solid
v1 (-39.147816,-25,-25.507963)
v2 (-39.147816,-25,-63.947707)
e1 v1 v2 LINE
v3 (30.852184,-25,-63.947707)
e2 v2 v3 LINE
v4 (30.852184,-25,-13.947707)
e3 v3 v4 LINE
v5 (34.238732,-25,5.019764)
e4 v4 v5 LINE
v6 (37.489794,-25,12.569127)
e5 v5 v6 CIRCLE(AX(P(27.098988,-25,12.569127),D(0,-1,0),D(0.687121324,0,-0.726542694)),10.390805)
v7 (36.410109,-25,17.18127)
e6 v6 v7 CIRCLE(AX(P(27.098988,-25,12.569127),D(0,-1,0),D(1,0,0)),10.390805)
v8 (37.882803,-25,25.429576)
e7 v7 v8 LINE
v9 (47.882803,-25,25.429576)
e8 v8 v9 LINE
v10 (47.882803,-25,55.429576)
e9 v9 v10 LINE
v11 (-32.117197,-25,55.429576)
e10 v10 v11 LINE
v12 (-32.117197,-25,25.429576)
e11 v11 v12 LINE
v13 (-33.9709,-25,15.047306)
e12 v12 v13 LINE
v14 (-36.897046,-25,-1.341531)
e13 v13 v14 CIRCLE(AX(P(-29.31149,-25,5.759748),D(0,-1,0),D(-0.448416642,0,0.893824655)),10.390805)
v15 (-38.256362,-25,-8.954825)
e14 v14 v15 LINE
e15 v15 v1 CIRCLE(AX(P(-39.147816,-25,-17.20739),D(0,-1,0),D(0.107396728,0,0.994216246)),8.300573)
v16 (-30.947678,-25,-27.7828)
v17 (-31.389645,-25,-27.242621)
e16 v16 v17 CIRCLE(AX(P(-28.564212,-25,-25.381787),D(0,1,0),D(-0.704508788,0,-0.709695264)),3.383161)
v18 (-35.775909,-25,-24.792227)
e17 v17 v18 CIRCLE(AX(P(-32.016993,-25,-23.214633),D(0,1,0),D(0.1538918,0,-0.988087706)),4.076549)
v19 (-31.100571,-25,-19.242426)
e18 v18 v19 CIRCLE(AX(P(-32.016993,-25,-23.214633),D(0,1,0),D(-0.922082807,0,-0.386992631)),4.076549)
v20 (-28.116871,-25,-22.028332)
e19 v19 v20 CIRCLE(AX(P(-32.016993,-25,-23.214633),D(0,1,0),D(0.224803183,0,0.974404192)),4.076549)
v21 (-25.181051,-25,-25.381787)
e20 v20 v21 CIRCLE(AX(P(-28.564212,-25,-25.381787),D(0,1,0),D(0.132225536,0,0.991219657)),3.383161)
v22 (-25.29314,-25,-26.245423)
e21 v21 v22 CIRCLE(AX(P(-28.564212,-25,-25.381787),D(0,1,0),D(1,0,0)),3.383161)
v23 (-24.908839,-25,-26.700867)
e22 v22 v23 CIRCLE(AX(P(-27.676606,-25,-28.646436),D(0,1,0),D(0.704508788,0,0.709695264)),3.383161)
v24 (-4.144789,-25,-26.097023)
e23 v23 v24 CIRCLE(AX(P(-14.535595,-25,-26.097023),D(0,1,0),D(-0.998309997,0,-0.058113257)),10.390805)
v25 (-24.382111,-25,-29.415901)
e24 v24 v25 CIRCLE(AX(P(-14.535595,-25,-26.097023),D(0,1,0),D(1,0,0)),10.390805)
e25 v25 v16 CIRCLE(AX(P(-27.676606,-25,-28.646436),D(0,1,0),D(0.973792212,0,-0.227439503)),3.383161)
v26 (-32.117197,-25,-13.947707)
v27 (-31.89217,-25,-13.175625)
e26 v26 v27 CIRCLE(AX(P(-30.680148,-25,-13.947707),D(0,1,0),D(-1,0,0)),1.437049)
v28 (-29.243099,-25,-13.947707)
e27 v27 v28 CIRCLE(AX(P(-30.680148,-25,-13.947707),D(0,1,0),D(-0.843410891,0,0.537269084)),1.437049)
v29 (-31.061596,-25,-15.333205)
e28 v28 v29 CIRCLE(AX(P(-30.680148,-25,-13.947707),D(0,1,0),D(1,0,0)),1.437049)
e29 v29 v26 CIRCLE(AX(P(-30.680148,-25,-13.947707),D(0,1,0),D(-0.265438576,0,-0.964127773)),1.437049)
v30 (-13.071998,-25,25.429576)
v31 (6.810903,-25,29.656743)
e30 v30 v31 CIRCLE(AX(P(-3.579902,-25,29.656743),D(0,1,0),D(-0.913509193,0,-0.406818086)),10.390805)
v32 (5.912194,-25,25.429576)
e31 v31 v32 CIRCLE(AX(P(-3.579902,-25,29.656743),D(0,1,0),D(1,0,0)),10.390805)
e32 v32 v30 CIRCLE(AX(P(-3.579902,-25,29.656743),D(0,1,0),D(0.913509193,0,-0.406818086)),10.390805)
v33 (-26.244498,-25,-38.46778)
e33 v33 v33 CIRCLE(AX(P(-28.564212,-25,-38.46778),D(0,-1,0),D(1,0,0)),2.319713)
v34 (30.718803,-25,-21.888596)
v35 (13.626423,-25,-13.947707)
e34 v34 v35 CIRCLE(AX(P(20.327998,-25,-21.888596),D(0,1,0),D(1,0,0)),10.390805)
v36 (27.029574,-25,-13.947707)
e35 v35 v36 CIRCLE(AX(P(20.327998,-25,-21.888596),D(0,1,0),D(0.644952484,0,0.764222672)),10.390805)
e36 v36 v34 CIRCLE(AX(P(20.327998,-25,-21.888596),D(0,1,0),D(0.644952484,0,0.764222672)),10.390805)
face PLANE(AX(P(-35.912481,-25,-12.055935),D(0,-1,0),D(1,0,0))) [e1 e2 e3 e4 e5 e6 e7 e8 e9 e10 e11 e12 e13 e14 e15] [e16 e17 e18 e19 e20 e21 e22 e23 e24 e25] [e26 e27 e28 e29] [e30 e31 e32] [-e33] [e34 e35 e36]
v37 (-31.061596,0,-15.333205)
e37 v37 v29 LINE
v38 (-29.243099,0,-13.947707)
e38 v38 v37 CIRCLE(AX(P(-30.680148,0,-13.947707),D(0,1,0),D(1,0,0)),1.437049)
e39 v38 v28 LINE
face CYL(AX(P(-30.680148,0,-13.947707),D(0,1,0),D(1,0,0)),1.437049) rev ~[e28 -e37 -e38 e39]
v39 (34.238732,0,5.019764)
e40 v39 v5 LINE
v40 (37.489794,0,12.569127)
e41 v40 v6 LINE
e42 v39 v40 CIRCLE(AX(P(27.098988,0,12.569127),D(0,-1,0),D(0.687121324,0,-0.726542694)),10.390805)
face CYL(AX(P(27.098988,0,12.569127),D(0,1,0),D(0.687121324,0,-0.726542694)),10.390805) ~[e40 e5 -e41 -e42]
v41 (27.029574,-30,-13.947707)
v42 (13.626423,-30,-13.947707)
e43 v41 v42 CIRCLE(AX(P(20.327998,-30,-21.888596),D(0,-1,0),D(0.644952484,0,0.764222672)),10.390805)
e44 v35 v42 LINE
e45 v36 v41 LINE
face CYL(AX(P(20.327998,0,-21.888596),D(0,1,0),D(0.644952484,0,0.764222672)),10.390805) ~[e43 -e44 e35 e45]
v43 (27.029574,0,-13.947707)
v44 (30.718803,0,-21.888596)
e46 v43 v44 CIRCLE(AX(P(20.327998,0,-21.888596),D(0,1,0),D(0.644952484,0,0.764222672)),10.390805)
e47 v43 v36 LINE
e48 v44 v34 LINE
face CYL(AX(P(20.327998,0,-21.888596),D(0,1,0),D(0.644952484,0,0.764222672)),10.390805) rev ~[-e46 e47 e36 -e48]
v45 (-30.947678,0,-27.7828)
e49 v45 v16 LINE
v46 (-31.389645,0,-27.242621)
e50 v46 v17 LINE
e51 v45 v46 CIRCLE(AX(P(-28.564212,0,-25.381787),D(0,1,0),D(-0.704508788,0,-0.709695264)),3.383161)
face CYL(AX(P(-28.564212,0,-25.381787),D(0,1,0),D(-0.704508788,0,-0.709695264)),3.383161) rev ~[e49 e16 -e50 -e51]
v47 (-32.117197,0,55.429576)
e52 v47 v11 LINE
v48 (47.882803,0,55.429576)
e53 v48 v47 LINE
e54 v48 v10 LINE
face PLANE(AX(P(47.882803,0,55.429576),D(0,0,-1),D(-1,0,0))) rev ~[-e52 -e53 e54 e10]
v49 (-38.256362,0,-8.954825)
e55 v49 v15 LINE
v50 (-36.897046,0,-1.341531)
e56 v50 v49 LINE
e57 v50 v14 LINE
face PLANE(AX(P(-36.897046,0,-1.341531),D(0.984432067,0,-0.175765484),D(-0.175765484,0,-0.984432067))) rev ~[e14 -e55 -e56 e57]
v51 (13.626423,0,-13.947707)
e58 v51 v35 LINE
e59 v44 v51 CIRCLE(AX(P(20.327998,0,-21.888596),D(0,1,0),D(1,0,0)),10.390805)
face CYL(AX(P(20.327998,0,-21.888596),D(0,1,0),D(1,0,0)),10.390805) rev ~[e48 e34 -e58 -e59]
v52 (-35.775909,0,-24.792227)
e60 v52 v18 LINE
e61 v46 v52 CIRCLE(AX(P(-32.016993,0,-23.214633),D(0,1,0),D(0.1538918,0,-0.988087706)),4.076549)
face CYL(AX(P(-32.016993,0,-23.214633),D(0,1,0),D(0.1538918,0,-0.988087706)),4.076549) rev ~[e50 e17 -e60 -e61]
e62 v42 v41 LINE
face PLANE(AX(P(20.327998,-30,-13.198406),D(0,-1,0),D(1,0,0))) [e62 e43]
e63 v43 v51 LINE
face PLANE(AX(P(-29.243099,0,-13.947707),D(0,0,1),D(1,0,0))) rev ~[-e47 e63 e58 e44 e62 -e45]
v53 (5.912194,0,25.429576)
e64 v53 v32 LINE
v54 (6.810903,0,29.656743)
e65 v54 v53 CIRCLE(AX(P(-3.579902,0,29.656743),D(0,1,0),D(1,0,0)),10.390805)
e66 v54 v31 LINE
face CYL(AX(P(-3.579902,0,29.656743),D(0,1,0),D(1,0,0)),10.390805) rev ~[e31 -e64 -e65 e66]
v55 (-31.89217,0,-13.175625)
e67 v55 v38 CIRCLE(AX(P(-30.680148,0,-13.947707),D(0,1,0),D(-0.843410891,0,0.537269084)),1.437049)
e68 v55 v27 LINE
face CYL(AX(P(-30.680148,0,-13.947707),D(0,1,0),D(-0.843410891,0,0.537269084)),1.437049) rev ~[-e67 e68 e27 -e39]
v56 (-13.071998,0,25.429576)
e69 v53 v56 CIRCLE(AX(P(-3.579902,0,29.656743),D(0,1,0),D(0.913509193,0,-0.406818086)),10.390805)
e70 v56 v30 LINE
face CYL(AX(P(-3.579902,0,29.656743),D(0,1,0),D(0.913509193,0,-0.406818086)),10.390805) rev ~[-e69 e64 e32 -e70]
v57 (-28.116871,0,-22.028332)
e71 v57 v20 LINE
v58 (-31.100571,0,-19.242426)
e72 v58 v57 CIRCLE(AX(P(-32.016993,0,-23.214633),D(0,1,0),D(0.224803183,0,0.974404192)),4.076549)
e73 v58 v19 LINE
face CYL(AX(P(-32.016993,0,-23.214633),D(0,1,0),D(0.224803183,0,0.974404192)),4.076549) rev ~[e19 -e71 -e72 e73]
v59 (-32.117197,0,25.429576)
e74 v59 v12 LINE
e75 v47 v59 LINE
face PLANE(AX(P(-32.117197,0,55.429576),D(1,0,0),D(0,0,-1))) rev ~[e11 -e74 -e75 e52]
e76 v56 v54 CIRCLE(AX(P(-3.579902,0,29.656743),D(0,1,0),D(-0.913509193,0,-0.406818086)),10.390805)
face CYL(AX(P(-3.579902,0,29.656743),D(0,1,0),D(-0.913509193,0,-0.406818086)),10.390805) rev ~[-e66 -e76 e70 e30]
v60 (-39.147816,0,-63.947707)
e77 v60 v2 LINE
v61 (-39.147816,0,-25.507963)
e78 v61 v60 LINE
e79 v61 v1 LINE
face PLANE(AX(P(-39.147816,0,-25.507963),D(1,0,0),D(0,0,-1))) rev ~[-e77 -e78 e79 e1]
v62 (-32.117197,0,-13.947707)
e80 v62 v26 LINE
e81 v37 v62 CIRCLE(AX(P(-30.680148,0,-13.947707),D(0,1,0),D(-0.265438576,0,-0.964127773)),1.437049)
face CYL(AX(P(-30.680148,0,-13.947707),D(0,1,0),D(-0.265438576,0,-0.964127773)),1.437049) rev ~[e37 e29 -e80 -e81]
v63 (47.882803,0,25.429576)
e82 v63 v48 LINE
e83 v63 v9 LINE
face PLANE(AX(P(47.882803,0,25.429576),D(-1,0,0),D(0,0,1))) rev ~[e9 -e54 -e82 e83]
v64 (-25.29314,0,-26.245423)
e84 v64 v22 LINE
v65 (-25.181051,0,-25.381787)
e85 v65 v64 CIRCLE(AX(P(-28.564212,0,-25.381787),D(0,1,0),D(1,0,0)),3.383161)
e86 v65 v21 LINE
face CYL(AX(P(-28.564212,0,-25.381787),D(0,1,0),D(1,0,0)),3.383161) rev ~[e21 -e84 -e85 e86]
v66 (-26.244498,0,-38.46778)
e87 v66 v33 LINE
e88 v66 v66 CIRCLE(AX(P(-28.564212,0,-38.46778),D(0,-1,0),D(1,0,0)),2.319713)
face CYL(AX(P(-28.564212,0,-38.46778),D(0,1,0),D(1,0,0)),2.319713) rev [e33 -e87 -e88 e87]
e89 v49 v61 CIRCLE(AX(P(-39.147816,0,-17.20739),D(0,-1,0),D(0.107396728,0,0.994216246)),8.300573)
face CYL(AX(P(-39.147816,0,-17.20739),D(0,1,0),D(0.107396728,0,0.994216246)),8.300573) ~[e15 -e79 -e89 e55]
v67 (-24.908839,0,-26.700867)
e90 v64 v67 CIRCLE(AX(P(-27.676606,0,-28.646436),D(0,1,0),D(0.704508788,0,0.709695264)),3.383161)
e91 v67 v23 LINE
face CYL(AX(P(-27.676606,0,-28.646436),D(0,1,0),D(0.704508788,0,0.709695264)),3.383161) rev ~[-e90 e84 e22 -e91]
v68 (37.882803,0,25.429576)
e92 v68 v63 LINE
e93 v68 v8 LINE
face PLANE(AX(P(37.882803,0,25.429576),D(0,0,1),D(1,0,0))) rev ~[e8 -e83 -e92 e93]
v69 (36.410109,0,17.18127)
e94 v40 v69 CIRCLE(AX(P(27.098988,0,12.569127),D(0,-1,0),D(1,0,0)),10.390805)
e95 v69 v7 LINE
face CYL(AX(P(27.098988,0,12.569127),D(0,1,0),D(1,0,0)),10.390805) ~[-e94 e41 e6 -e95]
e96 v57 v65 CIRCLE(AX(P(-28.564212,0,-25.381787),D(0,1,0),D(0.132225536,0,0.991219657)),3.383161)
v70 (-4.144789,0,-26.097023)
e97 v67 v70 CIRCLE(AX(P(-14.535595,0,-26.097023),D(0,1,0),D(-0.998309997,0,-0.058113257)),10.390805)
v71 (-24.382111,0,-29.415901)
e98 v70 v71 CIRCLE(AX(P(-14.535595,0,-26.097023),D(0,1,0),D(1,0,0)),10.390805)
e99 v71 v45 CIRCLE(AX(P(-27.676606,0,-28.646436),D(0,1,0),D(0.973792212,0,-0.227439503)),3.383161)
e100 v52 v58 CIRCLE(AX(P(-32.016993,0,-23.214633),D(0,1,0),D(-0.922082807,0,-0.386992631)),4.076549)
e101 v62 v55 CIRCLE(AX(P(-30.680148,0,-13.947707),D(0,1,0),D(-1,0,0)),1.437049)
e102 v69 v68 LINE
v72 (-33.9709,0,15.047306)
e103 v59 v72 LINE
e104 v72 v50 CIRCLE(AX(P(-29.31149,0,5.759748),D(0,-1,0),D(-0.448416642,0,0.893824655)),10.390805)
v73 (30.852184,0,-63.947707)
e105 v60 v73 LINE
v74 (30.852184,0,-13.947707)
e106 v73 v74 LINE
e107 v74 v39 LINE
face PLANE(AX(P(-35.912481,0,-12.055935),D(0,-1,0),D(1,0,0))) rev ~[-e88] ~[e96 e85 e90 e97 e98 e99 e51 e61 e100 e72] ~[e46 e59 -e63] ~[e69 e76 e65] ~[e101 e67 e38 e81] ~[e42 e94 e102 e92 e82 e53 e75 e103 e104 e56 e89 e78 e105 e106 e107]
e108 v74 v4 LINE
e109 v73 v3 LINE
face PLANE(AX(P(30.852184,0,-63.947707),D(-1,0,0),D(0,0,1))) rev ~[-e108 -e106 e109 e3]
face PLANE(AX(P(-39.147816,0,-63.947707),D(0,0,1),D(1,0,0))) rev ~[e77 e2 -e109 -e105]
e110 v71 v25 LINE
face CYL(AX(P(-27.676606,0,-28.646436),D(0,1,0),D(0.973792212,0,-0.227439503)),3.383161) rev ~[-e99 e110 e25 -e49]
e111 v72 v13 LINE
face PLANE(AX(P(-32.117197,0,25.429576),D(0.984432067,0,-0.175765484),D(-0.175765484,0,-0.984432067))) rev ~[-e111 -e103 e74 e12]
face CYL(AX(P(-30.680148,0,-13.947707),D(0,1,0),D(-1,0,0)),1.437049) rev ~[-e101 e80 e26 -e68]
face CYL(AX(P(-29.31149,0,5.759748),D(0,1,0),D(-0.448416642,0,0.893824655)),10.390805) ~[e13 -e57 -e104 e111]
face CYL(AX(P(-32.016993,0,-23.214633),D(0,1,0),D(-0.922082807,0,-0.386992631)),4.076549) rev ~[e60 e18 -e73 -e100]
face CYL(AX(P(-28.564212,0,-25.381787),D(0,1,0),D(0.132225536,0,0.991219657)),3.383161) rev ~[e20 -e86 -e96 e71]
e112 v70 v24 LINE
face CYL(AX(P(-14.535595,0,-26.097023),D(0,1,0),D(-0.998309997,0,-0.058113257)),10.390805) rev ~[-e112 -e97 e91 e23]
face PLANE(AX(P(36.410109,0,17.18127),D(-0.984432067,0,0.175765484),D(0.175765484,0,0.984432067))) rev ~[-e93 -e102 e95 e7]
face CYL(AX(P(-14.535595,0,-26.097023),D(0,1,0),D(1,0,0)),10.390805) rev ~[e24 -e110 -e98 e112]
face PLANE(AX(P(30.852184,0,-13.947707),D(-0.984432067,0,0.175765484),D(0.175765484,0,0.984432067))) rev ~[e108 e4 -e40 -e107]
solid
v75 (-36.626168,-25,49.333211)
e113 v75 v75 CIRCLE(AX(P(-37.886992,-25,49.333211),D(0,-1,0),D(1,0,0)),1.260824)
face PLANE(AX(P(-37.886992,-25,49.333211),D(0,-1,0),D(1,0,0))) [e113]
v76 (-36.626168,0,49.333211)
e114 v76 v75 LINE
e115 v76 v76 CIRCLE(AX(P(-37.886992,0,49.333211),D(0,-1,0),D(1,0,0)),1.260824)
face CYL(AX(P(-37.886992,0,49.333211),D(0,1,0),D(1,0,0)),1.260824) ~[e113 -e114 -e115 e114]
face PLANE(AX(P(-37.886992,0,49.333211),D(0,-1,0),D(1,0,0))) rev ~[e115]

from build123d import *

# Parameters (mm, degrees)
F1_DEPTH = 25
F2_DEPTH = 30
F0_R     = 2.3197134373
F3_DEPTH = 25
F0_R_2   = 1.2608238745


with BuildPart() as f1:
    # F0 (on Front) → F1 (new body)
    with BuildSketch(Plane.XZ):
        with BuildLine():
            Line((-36.8970455988, -1.3415312964), (-38.2563615468, -8.9548247595))
            ThreePointArc((-38.2563615468, -8.9548247595), (-34.5600498563, -10.2898813947), (-31.8921704478, -13.1756249373))
            ThreePointArc((-31.8921704478, -13.1756249373), (-30.2780449791, -12.5680611078), (-29.2430992407, -13.9477067703))
            Line((-29.2430992407, -13.9477067703), (13.6264225575, -13.9477067703))
            ThreePointArc((13.6264225575, -13.9477067703), (20.327998141, -11.4977905039), (27.0295737244, -13.9477067703))
            Line((27.0295737244, -13.9477067703), (30.8521840286, -13.9477067703))
            Line((30.8521840286, -13.9477067703), (34.2387321722, 5.0197635093))
            ThreePointArc((34.2387321722, 5.0197635093), (16.8699466245, 14.3954719517), (36.4101090954, 17.1812700081))
            Line((36.4101090954, 17.1812700081), (37.8828033788, 25.4295759134))
            Line((37.8828033788, 25.4295759134), (5.9121937531, 25.4295759134))
            ThreePointArc((5.9121937531, 25.4295759134), (-3.5799022512, 19.265938237), (-13.0719982556, 25.4295759134))
            Line((-13.0719982556, 25.4295759134), (-32.1171966212, 25.4295759134))
            Line((-32.1171966212, 25.4295759134), (-33.9708996127, 15.0473061488))
            ThreePointArc((-33.9708996127, 15.0473061488), (-23.8546677668, 14.6023681954), (-18.9206845351, 5.7597483341))
            ThreePointArc((-18.9206845351, 5.7597483341), (-25.4938465616, -3.9043311549), (-36.8970455988, -1.3415312964))
        make_face()
        with BuildLine():
            ThreePointArc((27.0295737244, -13.9477067703), (20.327998141, -11.4977905039), (13.6264225575, -13.9477067703))
            Line((13.6264225575, -13.9477067703), (27.0295737244, -13.9477067703))
        make_face()
    extrude(amount=F1_DEPTH)

    # F0 (on Front) → F2 (join)
    with BuildSketch(Plane.XZ):
        with BuildLine():
            ThreePointArc((27.0295737244, -13.9477067703), (20.327998141, -11.4977905039), (13.6264225575, -13.9477067703))
            Line((13.6264225575, -13.9477067703), (27.0295737244, -13.9477067703))
        make_face()
    extrude(amount=F2_DEPTH)

    # F0 (on Front) → F3 (join)
    with BuildSketch(Plane.XZ):
        with BuildLine():
            Line((-38.2563615468, -8.9548247595), (-39.1478159714, -13.9477067703))
            Line((-39.1478159714, -13.9477067703), (-32.1171966212, -13.9477067703))
            ThreePointArc((-32.1171966212, -13.9477067703), (-32.0597935936, -13.5456038184), (-31.8921704478, -13.1756249373))
            ThreePointArc((-31.8921704478, -13.1756249373), (-34.5600498563, -10.2898813947), (-38.2563615468, -8.9548247595))
        make_face()
        with BuildLine():
            Line((-32.1171966212, -13.9477067703), (-39.1478159714, -13.9477067703))
            Line((-39.1478159714, -13.9477067703), (-39.1478159714, -25.5079631141))
            ThreePointArc((-39.1478159714, -25.5079631141), (-37.4242994609, -25.3270577869), (-35.7759086803, -24.7922272215))
            ThreePointArc((-35.7759086803, -24.7922272215), (-35.1346869248, -20.5881831631), (-31.1005712876, -19.2424258261))
            ThreePointArc((-31.1005712876, -19.2424258261), (-30.9108182069, -18.2327612754), (-30.8472425547, -17.2073896974))
            ThreePointArc((-30.8472425547, -17.2073896974), (-30.9010050472, -16.2641884324), (-31.0615960895, -15.3332053234))
            ThreePointArc((-31.0615960895, -15.3332053234), (-31.8232289681, -14.8186112891), (-32.1171966212, -13.9477067703))
        make_face()
        with BuildLine():
            Line((-39.1478159714, -25.5079631141), (-39.1478159714, -13.9477067703))
            Line((-39.1478159714, -13.9477067703), (-38.2563615468, -8.9548247595))
            ThreePointArc((-38.2563615468, -8.9548247595), (-47.4363785787, -16.7610165897), (-39.1478159714, -25.5079631141))
        make_face()
        with BuildLine():
            ThreePointArc((-35.7759086803, -24.7922272215), (-37.4242994609, -25.3270577869), (-39.1478159714, -25.5079631141))
            Line((-39.1478159714, -25.5079631141), (-39.1478159714, -63.9477067703))
            Line((-39.1478159714, -63.9477067703), (30.8521840286, -63.9477067703))
            Line((30.8521840286, -63.9477067703), (30.8521840286, -13.9477067703))
            Line((30.8521840286, -13.9477067703), (27.0295737244, -13.9477067703))
            ThreePointArc((27.0295737244, -13.9477067703), (29.7514687642, -17.510578657), (30.71880327, -21.8885956329))
            ThreePointArc((30.71880327, -21.8885956329), (15.949981165, -31.3120662561), (13.6264225575, -13.9477067703))
            Line((13.6264225575, -13.9477067703), (-29.2430992407, -13.9477067703))
            ThreePointArc((-29.2430992407, -13.9477067703), (-29.8092434122, -15.0907878075), (-31.0615960895, -15.3332053234))
            ThreePointArc((-31.0615960895, -15.3332053234), (-30.9010050472, -16.2641884324), (-30.8472425547, -17.2073896974))
            ThreePointArc((-30.8472425547, -17.2073896974), (-30.9108182069, -18.2327612754), (-31.1005712876, -19.2424258261))
            ThreePointArc((-31.1005712876, -19.2424258261), (-29.2348911506, -20.2350073875), (-28.1168713895, -22.0283317708))
            ThreePointArc((-28.1168713895, -22.0283317708), (-26.0187057491, -23.153295251), (-25.1810509111, -25.3817871757))
            ThreePointArc((-25.1810509111, -25.3817871757), (-25.209190214, -25.817226894), (-25.2931400278, -26.2454231077))
            ThreePointArc((-25.2931400278, -26.2454231077), (-25.0909422893, -26.4646669846), (-24.908839255, -26.7008666627))
            ThreePointArc((-24.908839255, -26.7008666627), (-14.8376440321, -15.7106090516), (-4.1447894931, -26.0970231288))
            ThreePointArc((-4.1447894931, -26.0970231288), (-12.8539883778, -36.3508532263), (-24.3821109254, -29.4159006375))
            ThreePointArc((-24.3821109254, -29.4159006375), (-28.4932406364, -31.9295574903), (-30.9476780862, -27.7828003139))
            ThreePointArc((-30.9476780862, -27.7828003139), (-31.1826286879, -27.5241383485), (-31.3896450432, -27.2426209845))
            ThreePointArc((-31.3896450432, -27.2426209845), (-34.0051544965, -26.7734902048), (-35.7759086803, -24.7922272215))
        make_face()
        with Locations((-28.5642116289, -38.4677797556)):
            Circle(F0_R, mode=Mode.SUBTRACT)
        with BuildLine():
            Line((-36.8970455988, -1.3415312964), (-38.2563615468, -8.9548247595))
            ThreePointArc((-38.2563615468, -8.9548247595), (-34.5600498563, -10.2898813947), (-31.8921704478, -13.1756249373))
            ThreePointArc((-31.8921704478, -13.1756249373), (-30.2780449791, -12.5680611078), (-29.2430992407, -13.9477067703))
            Line((-29.2430992407, -13.9477067703), (13.6264225575, -13.9477067703))
            ThreePointArc((13.6264225575, -13.9477067703), (20.327998141, -11.4977905039), (27.0295737244, -13.9477067703))
            Line((27.0295737244, -13.9477067703), (30.8521840286, -13.9477067703))
            Line((30.8521840286, -13.9477067703), (34.2387321722, 5.0197635093))
            ThreePointArc((34.2387321722, 5.0197635093), (16.8699466245, 14.3954719517), (36.4101090954, 17.1812700081))
            Line((36.4101090954, 17.1812700081), (37.8828033788, 25.4295759134))
            Line((37.8828033788, 25.4295759134), (5.9121937531, 25.4295759134))
            ThreePointArc((5.9121937531, 25.4295759134), (-3.5799022512, 19.265938237), (-13.0719982556, 25.4295759134))
            Line((-13.0719982556, 25.4295759134), (-32.1171966212, 25.4295759134))
            Line((-32.1171966212, 25.4295759134), (-33.9708996127, 15.0473061488))
            ThreePointArc((-33.9708996127, 15.0473061488), (-23.8546677668, 14.6023681954), (-18.9206845351, 5.7597483341))
            ThreePointArc((-18.9206845351, 5.7597483341), (-25.4938465616, -3.9043311549), (-36.8970455988, -1.3415312964))
        make_face()
        with BuildLine():
            ThreePointArc((-33.9708996127, 15.0473061488), (-39.540531436, 7.5860932242), (-36.8970455988, -1.3415312964))
            Line((-36.8970455988, -1.3415312964), (-33.9708996127, 15.0473061488))
        make_face()
        with BuildLine():
            Line((-33.9708996127, 15.0473061488), (-36.8970455988, -1.3415312964))
            ThreePointArc((-36.8970455988, -1.3415312964), (-25.4938465616, -3.9043311549), (-18.9206845351, 5.7597483341))
            ThreePointArc((-18.9206845351, 5.7597483341), (-23.8546677668, 14.6023681954), (-33.9708996127, 15.0473061488))
        make_face()
        with BuildLine():
            Line((-32.1171966212, 55.4295759134), (-32.1171966212, 25.4295759134))
            Line((-32.1171966212, 25.4295759134), (-13.0719982556, 25.4295759134))
            ThreePointArc((-13.0719982556, 25.4295759134), (-5.740725171, 39.8203881619), (6.8109028777, 29.6567433659))
            ThreePointArc((6.8109028777, 29.6567433659), (6.5837425447, 27.4959204462), (5.9121937531, 25.4295759134))
            Line((5.9121937531, 25.4295759134), (37.8828033788, 25.4295759134))
            Line((37.8828033788, 25.4295759134), (47.8828033788, 25.4295759134))
            Line((47.8828033788, 25.4295759134), (47.8828033788, 55.4295759134))
            Line((47.8828033788, 55.4295759134), (-32.1171966212, 55.4295759134))
        make_face()
        with BuildLine():
            ThreePointArc((36.4101090954, 17.1812700081), (16.8699466245, 14.3954719517), (34.2387321722, 5.0197635093))
            Line((34.2387321722, 5.0197635093), (36.4101090954, 17.1812700081))
        make_face()
        with BuildLine():
            Line((36.4101090954, 17.1812700081), (34.2387321722, 5.0197635093))
            ThreePointArc((34.2387321722, 5.0197635093), (36.6424814014, 8.4593128941), (37.4897935254, 12.5691270616))
            ThreePointArc((37.4897935254, 12.5691270616), (37.2162724179, 14.9375432533), (36.4101090954, 17.1812700081))
        make_face()
    extrude(amount=F3_DEPTH)


with BuildPart() as f3:
    # F0 (on Front) → F3, piece 2 (new body)
    with BuildSketch(Plane.XZ):
        with Locations((-37.8869920969, 49.3332110345)):
            Circle(F0_R_2)
    extrude(amount=F3_DEPTH)


solid = Compound([f1.part, f3.part])
